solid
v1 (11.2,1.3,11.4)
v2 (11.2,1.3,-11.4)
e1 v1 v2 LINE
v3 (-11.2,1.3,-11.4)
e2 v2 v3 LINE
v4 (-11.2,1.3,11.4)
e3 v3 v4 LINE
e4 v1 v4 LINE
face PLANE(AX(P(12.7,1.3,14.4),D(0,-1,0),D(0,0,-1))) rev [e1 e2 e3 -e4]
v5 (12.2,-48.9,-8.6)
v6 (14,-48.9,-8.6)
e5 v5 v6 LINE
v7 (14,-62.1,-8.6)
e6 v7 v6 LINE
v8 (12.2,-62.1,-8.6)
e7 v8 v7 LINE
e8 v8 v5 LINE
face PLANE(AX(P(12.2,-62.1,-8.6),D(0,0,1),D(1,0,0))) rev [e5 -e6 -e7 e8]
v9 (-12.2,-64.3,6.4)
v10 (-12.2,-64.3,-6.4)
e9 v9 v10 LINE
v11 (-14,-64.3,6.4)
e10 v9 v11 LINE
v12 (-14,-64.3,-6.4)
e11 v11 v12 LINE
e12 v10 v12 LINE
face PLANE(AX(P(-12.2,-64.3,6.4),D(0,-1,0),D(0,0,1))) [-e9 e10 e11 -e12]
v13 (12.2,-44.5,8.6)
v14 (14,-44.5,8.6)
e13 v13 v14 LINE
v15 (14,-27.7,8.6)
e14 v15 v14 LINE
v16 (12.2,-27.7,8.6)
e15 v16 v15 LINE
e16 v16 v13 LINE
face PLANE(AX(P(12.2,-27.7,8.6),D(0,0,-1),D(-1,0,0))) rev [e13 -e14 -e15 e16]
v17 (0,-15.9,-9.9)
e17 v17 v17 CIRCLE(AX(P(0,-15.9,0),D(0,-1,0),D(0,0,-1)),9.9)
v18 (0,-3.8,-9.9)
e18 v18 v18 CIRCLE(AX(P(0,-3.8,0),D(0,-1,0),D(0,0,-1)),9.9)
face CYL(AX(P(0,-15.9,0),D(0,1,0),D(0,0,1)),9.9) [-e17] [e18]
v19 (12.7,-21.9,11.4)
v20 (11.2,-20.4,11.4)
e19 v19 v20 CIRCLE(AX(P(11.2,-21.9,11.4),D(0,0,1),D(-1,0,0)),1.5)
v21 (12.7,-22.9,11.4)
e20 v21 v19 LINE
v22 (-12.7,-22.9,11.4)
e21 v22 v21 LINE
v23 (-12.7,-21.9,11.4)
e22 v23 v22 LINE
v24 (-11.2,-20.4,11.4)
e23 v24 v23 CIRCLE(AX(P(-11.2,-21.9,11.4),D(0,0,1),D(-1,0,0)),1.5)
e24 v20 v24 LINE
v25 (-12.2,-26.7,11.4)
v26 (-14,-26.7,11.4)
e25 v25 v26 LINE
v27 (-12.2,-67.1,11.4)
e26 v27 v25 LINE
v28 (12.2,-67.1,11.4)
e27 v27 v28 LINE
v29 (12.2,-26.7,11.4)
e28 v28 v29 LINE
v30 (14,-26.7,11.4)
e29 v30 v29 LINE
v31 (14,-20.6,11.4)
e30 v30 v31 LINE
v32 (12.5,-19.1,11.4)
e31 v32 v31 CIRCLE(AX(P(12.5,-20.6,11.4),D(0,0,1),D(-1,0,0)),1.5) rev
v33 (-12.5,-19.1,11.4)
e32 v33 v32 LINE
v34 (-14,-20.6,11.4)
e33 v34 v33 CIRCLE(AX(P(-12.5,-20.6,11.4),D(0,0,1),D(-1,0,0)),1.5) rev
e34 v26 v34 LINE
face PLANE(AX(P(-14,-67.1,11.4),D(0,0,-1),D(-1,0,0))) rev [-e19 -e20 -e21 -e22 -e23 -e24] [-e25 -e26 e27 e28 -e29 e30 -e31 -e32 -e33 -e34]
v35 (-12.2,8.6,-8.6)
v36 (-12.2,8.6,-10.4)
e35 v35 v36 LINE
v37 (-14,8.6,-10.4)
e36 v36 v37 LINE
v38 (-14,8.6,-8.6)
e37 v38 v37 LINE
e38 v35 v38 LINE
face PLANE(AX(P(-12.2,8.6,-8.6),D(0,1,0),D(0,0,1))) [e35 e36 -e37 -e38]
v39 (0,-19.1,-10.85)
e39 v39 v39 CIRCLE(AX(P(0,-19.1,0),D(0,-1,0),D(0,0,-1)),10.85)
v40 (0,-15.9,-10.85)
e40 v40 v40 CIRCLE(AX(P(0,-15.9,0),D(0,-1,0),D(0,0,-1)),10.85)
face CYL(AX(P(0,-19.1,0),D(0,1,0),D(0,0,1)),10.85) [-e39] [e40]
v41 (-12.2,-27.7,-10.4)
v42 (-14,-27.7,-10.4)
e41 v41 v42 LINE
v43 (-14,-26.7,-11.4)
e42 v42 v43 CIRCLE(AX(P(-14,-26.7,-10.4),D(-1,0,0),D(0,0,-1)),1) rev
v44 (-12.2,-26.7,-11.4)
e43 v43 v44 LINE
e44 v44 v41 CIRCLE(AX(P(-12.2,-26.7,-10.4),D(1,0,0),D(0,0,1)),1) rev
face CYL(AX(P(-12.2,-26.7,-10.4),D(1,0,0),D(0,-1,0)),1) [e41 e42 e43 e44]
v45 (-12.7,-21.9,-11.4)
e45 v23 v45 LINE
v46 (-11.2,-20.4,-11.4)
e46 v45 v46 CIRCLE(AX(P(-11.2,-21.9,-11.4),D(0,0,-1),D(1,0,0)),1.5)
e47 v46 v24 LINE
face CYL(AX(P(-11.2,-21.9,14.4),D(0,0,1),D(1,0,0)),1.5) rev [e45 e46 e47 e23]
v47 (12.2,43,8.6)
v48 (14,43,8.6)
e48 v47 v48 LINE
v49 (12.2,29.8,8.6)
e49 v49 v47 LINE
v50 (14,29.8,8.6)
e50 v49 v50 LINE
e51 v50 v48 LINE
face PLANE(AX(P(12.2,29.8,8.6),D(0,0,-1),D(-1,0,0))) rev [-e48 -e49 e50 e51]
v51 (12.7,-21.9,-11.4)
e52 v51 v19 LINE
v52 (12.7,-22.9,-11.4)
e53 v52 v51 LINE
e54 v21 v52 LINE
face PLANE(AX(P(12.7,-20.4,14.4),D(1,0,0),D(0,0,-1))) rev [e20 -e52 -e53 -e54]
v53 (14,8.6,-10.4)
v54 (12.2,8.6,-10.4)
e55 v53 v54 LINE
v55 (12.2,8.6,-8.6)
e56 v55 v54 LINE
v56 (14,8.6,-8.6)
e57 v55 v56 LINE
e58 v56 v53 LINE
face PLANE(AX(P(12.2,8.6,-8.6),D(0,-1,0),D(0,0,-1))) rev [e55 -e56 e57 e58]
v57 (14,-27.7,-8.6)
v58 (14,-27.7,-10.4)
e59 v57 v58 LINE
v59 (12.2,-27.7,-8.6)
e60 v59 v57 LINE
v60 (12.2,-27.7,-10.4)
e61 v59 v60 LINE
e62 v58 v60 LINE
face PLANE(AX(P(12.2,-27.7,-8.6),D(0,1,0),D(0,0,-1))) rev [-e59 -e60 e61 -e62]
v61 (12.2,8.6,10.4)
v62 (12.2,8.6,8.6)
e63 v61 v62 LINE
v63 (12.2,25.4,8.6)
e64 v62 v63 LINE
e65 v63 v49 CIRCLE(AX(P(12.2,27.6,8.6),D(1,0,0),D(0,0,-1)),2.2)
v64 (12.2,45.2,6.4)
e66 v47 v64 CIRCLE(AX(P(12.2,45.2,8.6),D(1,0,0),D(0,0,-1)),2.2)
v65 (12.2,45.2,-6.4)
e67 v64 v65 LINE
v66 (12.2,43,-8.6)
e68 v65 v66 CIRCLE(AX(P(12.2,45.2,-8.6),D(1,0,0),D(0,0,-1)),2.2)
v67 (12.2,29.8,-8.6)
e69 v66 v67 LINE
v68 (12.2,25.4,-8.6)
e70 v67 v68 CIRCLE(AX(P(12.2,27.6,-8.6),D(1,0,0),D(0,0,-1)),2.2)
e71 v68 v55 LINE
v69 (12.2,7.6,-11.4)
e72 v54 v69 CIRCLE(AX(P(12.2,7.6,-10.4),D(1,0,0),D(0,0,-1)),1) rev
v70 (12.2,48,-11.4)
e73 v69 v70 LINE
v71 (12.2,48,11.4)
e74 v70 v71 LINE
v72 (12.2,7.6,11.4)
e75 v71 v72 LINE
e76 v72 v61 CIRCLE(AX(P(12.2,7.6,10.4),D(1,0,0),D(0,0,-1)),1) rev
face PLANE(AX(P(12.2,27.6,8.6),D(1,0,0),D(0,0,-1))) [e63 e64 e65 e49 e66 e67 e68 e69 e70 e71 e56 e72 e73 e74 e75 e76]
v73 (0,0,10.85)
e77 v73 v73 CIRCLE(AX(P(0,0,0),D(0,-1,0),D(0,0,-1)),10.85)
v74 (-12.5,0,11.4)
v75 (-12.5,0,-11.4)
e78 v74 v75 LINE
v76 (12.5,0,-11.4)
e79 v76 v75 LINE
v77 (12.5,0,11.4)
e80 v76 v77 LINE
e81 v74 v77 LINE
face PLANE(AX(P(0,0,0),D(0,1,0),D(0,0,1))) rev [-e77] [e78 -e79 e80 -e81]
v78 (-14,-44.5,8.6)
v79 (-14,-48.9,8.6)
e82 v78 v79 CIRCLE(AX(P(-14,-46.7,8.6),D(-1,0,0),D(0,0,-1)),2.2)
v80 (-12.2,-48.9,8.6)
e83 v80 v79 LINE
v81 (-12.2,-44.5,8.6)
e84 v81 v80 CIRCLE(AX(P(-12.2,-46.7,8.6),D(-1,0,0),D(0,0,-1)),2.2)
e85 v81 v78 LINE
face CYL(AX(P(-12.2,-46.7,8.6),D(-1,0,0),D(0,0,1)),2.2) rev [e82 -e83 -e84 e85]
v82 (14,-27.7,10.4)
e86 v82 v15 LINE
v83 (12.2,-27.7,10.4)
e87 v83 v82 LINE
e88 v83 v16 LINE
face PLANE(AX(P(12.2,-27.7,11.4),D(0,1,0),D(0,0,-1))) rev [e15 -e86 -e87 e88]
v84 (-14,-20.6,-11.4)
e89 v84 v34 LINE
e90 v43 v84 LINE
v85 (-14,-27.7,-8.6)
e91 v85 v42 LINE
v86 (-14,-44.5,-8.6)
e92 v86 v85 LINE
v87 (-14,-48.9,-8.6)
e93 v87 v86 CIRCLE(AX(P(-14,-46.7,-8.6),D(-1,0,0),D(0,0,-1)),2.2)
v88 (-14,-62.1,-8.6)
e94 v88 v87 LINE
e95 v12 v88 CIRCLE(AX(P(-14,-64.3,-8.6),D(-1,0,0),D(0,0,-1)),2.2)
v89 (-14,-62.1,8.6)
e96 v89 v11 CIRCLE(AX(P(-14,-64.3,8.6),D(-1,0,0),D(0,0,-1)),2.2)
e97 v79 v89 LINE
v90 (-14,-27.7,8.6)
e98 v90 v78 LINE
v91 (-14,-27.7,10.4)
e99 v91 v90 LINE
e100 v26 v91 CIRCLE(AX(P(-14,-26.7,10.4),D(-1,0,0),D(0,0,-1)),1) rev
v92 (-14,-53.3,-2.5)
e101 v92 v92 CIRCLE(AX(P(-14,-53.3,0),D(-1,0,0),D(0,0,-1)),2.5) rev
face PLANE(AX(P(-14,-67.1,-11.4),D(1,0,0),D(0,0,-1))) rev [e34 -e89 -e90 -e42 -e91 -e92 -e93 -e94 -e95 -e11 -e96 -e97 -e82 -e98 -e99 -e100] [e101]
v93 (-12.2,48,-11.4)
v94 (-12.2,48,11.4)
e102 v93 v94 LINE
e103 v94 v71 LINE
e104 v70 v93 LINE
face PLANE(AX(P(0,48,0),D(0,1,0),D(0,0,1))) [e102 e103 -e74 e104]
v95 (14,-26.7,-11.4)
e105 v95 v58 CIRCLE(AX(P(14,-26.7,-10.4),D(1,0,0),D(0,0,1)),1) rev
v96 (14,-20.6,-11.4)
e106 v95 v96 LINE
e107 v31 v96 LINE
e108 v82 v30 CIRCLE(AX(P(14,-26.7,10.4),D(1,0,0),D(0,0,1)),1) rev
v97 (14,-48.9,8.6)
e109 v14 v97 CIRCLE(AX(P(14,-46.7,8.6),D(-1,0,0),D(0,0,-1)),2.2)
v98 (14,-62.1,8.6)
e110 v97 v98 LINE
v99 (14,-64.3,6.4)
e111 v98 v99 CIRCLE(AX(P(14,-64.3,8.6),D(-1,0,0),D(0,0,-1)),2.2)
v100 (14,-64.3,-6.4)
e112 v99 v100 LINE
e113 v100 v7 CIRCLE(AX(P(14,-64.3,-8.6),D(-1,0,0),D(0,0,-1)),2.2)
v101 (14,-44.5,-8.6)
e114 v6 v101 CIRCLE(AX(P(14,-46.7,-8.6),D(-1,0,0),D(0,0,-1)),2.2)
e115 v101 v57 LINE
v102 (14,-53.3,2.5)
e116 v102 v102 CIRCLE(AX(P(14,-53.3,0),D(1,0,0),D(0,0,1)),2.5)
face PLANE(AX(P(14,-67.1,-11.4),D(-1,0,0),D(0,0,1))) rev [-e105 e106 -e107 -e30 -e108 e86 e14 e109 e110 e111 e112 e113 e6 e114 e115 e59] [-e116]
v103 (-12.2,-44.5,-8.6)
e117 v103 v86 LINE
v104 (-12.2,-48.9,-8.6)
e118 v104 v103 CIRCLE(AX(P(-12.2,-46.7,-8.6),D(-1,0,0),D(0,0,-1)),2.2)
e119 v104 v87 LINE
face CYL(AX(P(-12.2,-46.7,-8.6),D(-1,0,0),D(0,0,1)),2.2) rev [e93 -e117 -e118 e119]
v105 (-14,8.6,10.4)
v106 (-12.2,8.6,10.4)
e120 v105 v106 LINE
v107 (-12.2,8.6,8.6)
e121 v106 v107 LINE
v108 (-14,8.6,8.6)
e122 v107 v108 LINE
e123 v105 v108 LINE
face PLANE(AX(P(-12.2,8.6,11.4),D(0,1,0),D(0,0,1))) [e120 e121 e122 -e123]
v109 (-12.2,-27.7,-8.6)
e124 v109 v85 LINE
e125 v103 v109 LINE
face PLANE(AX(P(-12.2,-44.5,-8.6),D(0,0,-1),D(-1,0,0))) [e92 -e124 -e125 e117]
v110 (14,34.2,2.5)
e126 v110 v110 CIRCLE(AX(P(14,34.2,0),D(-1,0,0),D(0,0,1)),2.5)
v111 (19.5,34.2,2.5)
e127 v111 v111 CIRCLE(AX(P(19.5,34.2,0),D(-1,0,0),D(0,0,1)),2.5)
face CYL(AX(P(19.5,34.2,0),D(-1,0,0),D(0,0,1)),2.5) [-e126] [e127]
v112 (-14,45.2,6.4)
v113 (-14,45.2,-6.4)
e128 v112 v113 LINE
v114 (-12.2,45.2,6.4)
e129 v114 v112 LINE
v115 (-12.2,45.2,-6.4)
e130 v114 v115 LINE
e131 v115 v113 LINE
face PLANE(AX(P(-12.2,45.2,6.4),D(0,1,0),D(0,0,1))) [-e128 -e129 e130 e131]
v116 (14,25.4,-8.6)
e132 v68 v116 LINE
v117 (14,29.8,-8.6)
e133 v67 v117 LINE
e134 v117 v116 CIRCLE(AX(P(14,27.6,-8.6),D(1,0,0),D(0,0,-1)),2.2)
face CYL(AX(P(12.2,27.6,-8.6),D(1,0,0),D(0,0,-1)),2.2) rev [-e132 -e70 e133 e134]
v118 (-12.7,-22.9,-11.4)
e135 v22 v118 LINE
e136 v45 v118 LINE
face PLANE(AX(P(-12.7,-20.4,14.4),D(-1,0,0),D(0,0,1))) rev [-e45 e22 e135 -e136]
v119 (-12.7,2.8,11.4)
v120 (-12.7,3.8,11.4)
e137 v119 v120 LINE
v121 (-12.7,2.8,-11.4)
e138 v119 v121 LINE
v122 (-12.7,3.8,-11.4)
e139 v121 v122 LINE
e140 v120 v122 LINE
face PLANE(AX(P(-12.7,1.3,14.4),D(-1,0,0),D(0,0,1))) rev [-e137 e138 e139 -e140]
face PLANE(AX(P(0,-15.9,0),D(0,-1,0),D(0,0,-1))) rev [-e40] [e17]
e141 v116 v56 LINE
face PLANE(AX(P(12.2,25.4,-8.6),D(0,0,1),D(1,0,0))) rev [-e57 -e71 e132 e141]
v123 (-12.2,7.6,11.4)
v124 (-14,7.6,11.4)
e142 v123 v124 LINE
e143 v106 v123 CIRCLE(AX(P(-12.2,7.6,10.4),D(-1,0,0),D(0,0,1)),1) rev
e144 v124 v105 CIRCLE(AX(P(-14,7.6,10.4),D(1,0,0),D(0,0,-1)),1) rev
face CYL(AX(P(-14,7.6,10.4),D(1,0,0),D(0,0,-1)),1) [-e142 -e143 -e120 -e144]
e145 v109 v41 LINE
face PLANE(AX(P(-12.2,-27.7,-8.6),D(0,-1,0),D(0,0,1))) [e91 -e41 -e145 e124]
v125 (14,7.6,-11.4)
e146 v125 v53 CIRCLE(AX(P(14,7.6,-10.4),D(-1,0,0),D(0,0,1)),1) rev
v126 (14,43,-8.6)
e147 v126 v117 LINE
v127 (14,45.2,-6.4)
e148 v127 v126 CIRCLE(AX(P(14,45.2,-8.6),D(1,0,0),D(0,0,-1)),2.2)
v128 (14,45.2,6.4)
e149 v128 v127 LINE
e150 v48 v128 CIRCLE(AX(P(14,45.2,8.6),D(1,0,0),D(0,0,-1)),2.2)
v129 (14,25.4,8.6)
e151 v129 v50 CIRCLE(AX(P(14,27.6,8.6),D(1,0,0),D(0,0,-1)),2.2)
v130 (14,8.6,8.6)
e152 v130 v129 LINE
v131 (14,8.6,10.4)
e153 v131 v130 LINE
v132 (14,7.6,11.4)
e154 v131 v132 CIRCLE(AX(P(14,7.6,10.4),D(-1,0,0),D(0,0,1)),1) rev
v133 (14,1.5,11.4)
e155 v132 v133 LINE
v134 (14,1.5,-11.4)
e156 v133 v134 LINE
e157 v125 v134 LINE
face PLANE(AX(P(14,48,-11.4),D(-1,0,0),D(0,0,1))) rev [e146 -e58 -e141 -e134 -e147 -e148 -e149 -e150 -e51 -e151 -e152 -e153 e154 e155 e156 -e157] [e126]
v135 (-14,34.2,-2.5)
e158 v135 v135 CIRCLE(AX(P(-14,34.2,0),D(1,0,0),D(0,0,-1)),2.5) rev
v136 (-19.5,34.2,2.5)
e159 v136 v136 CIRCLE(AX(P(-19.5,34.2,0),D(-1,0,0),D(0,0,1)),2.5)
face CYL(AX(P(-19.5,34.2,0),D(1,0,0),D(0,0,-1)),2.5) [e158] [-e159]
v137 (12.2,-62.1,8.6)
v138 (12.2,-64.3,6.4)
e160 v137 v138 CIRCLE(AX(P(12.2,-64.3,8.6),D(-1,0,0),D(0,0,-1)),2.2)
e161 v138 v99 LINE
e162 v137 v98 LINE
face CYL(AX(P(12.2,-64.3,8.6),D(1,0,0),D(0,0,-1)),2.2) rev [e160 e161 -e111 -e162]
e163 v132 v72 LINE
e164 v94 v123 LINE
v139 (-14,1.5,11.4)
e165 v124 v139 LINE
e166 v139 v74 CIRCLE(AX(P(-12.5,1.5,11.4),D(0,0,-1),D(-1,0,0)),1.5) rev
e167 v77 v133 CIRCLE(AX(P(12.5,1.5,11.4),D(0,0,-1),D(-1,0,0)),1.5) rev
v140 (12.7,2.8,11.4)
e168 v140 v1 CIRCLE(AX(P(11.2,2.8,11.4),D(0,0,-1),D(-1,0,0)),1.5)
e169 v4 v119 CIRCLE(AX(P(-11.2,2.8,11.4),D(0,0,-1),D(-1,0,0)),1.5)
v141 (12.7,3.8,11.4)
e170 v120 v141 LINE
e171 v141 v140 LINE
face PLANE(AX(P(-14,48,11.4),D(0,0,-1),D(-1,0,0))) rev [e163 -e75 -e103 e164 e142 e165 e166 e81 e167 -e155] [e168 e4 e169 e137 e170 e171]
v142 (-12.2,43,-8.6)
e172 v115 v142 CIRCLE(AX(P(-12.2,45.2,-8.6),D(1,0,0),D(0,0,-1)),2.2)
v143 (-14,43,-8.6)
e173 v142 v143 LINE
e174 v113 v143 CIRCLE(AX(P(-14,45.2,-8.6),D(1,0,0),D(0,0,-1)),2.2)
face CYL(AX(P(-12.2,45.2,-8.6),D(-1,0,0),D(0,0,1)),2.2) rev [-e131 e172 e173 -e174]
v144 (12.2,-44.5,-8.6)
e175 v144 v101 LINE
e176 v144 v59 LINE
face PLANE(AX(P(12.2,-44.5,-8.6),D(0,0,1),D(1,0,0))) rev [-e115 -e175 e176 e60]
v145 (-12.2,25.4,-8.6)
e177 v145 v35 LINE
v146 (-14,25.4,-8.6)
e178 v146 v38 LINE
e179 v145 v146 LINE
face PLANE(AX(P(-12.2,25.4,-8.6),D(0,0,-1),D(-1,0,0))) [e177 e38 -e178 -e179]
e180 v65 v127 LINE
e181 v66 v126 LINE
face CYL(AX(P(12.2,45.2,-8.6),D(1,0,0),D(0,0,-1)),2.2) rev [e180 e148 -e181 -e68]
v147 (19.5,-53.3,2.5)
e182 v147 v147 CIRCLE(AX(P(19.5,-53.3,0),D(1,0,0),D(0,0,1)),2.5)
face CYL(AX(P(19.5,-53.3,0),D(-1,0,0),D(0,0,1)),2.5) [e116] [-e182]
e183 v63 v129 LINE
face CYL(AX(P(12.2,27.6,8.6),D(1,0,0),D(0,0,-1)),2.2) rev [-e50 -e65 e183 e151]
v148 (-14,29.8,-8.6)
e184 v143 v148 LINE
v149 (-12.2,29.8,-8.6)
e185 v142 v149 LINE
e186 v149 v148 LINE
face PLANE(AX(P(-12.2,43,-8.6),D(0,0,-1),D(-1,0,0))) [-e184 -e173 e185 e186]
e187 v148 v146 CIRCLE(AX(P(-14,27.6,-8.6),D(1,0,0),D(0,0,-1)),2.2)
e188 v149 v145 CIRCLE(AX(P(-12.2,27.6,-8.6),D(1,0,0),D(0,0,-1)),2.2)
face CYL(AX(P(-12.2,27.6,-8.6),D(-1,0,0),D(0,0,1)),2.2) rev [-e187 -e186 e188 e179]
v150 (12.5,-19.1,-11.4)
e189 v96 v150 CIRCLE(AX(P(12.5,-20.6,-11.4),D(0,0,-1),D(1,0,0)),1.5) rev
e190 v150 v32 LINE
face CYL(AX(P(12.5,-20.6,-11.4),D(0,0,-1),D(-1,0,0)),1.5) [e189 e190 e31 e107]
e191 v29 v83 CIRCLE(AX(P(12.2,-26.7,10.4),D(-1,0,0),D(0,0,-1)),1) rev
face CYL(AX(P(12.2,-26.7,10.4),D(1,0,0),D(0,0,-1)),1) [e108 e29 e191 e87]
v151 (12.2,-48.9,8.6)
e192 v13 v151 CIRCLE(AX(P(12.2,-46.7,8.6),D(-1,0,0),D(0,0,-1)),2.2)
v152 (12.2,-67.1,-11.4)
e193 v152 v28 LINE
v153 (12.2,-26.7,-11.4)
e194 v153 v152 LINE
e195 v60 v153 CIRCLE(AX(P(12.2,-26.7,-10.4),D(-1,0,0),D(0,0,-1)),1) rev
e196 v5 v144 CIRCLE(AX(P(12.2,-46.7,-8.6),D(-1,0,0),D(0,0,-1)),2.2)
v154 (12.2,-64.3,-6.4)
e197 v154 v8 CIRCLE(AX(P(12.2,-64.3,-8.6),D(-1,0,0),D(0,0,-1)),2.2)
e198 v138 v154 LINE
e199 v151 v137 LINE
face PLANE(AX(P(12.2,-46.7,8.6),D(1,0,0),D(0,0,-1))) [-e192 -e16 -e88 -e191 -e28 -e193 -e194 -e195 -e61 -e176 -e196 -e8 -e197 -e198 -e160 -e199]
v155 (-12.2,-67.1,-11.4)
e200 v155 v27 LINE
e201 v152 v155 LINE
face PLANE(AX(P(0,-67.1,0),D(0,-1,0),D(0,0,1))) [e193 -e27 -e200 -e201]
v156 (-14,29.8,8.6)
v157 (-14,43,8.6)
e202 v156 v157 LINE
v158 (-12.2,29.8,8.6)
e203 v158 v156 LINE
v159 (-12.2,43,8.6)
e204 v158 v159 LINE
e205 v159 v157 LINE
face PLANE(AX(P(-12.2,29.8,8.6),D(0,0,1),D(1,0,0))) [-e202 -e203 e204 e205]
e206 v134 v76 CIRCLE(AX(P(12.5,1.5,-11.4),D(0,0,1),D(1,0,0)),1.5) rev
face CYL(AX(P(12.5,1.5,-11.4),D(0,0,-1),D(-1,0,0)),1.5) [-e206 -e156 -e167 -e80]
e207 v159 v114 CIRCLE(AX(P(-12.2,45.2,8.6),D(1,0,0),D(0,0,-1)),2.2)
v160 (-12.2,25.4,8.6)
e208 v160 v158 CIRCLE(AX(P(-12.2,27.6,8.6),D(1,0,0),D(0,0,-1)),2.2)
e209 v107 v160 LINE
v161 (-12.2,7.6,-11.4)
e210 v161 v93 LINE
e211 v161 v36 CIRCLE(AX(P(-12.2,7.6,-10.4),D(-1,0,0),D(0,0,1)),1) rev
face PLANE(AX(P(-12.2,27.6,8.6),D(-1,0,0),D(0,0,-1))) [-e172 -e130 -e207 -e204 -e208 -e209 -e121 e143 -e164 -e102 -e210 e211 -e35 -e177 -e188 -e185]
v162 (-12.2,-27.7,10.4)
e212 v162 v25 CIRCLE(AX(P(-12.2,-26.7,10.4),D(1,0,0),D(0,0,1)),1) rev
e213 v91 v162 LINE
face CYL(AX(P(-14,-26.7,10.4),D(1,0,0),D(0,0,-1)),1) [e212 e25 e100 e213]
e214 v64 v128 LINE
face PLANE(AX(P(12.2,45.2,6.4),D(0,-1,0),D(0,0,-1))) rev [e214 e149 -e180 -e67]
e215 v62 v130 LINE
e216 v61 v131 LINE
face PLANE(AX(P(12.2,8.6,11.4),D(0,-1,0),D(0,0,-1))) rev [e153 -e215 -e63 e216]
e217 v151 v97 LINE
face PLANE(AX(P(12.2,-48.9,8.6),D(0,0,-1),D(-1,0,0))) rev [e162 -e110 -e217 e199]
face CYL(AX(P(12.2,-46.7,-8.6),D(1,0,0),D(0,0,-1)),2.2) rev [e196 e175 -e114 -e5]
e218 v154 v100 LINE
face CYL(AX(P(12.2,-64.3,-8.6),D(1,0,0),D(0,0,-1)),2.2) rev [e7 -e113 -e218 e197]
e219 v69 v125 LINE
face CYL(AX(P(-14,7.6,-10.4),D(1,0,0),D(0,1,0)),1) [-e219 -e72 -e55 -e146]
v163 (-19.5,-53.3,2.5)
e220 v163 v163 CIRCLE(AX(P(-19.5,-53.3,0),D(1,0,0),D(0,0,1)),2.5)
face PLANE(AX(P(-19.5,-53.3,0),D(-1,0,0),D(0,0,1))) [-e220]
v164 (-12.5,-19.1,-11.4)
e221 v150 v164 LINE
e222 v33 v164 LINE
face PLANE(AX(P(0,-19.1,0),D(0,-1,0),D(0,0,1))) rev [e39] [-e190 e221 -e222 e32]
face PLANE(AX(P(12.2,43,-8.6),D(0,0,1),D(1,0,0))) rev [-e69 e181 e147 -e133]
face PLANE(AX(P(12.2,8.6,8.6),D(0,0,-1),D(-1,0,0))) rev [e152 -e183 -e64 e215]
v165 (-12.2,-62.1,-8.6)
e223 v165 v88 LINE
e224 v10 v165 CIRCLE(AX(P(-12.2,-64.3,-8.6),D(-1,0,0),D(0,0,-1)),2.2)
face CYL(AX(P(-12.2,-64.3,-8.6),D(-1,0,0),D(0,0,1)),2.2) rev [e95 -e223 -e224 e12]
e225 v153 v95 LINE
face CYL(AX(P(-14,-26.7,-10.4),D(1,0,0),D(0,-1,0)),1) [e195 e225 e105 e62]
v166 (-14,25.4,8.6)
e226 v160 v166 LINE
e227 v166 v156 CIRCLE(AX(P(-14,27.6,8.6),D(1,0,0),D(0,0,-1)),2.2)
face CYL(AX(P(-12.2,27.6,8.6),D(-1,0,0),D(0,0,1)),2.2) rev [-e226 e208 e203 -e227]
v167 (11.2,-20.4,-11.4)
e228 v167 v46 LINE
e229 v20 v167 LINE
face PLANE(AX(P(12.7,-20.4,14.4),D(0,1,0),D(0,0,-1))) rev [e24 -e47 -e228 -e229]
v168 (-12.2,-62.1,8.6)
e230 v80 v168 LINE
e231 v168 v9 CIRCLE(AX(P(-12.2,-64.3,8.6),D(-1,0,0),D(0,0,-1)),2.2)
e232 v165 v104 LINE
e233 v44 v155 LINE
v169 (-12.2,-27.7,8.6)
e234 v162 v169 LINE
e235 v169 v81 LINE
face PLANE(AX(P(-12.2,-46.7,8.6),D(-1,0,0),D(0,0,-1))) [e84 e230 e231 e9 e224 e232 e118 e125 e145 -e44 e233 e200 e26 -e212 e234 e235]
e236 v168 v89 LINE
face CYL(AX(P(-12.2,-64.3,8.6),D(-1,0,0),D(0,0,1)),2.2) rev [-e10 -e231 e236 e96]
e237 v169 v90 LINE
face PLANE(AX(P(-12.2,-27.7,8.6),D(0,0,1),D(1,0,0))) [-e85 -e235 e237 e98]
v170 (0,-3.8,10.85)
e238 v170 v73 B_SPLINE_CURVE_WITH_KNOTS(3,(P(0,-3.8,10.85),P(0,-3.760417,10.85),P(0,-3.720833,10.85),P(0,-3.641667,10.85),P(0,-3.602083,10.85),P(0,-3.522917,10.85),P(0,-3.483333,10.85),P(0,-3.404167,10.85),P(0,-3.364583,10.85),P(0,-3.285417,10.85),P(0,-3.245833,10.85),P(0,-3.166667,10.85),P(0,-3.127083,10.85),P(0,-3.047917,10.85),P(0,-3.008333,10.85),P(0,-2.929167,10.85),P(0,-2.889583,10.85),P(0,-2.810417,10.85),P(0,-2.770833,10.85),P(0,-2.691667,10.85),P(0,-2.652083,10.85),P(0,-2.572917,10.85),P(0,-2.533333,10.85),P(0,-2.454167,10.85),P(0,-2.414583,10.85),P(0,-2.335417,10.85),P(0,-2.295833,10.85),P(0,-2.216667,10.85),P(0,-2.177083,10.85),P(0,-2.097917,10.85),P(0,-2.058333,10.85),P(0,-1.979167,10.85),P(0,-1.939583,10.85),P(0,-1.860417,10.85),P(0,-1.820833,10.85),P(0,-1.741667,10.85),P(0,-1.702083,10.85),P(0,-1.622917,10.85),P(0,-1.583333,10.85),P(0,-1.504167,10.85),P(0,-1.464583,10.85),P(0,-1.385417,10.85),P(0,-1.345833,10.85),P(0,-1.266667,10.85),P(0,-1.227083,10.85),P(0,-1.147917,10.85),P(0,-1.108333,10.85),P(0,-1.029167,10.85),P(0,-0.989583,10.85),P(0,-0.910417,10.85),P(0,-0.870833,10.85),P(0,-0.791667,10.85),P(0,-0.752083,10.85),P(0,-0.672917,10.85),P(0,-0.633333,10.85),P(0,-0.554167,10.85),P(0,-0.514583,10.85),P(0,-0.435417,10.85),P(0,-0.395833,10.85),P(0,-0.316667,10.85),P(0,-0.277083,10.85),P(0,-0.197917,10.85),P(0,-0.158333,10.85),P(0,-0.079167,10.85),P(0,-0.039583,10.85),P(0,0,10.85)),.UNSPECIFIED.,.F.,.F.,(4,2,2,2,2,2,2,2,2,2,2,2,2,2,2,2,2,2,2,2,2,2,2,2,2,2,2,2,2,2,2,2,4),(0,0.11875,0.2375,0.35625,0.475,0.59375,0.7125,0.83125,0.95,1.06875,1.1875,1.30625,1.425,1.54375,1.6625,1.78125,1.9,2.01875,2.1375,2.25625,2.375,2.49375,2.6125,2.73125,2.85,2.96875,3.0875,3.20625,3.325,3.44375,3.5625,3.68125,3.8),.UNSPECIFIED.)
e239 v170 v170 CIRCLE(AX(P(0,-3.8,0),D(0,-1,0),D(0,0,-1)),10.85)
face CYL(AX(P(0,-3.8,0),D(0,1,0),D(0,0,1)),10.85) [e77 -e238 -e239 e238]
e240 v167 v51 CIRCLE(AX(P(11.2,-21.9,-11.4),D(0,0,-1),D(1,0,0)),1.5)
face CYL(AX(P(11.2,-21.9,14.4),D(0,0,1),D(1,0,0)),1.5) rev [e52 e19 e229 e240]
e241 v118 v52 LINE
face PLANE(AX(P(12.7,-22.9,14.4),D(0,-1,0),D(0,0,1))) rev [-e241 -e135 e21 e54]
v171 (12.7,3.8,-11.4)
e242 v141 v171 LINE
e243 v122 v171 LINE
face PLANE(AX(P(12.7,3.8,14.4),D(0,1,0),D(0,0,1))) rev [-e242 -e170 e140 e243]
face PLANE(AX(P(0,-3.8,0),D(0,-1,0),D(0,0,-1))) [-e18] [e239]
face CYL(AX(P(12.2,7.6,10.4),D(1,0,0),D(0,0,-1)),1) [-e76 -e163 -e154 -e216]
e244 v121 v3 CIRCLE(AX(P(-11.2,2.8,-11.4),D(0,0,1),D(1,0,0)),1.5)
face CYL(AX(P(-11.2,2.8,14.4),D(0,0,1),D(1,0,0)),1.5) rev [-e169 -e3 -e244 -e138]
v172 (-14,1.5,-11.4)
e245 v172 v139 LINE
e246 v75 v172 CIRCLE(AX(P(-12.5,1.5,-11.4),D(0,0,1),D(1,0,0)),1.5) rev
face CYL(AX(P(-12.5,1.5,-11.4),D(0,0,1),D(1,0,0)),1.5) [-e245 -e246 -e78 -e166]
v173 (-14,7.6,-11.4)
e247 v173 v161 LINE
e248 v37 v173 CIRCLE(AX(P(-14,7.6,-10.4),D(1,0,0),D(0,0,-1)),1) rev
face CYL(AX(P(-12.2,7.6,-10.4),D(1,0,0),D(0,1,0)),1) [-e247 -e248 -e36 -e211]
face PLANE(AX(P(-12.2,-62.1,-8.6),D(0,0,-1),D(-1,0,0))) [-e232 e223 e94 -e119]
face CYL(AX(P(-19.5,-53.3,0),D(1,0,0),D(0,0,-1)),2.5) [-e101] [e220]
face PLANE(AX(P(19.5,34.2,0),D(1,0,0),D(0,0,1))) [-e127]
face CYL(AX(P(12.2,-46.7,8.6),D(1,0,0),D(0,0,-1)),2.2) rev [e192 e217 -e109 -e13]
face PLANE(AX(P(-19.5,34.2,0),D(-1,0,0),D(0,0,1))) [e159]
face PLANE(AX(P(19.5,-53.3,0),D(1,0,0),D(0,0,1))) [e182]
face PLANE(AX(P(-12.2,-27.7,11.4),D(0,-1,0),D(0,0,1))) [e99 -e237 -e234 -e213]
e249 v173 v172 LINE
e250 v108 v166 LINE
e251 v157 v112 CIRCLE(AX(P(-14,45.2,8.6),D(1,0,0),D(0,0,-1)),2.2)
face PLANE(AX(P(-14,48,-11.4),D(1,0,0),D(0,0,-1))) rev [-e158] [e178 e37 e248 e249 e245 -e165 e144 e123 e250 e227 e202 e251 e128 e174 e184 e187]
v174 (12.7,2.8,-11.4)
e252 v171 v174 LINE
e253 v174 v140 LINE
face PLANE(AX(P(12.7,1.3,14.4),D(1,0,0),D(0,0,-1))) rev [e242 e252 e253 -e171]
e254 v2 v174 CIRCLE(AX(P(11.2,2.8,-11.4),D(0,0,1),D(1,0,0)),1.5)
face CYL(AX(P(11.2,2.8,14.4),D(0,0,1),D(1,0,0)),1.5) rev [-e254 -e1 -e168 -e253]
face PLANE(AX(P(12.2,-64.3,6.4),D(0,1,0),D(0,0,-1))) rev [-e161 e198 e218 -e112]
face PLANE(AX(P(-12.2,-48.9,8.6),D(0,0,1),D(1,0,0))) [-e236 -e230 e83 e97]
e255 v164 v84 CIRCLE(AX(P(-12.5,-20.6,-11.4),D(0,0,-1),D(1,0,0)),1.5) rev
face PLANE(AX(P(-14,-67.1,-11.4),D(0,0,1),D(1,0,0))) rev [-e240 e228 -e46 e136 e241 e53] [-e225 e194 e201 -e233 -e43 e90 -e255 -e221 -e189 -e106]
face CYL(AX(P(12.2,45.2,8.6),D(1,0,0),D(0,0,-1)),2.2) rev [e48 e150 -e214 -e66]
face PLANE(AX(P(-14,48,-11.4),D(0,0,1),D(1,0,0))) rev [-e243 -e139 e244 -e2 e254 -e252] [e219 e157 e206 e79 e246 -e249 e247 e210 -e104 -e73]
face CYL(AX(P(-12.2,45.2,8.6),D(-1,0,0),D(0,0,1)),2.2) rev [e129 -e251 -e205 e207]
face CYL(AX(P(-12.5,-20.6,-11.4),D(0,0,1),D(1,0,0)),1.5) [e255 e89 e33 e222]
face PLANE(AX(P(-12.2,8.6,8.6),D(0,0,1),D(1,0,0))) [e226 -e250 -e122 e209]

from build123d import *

# Parameters (mm, degrees)
SKETCH1_W            = 28
SKETCH1_H            = 22.8
BOSS_EXTRUDE1_DEPTH  = 48
SKETCH4_R            = 10.85
BOSS_EXTRUDE4_DEPTH  = 3.8
SKETCH5_R            = 9.9
BOSS_EXTRUDE5_DEPTH  = 12.1
SKETCH6_R            = 10.85
BOSS_EXTRUDE6_DEPTH  = 3.2
CUT_EXTRUDE3_DEPTH   = 1.8
FILLET2_R            = 1
FILLET2_OF_MIRROR2_R = 1
SKETCH9_W            = 25.4
SKETCH9_H            = 2.5
CUT_EXTRUDE4_DEPTH   = 25.8
FILLET3_R            = 1.5
SKETCH10_R           = 2.5
BOSS_EXTRUDE7_DEPTH  = 5.5
MIRROR6_START        = -12.2
MIRROR6_OUTLINE_W    = 1.3
MIRROR6_OUTLINE_H    = 22.8
MIRROR6_OUTLINE_W_2  = 44.2
MIRROR6_DEPTH        = 24.4
MIRROR6_START_2      = -14
MIRROR6_2_DEPTH      = 28
MIRROR6_START_3      = -19.5
MIRROR6_3_OUTLINE_R  = 2.5
MIRROR6_3_DEPTH      = 39
MIRROR6_START_4      = -12.5
MIRROR6_4_OUTLINE_W  = 1.3
MIRROR6_4_OUTLINE_H  = 22.8
MIRROR6_4_DEPTH      = 25
MIRROR6_START_5      = -11.4
MIRROR6_5_DEPTH      = 22.8


with BuildPart() as part:
    # Sketch1 → Boss-Extrude1 (new body)
    with BuildSketch(Plane(origin=(0, 0, 0), x_dir=(1, 0, 0), z_dir=(0, 1, 0))):
        Rectangle(SKETCH1_W, SKETCH1_H)
    extrude(amount=BOSS_EXTRUDE1_DEPTH)

    # Sketch4 → Boss-Extrude4 (add)
    with BuildSketch(Plane.XZ):
        with Locations(Location((0, 0, 0), (0, 0, 90))):
            Circle(SKETCH4_R)
    extrude(amount=BOSS_EXTRUDE4_DEPTH)

    # Sketch5 → Boss-Extrude5 (add)
    with BuildSketch(Plane.XZ.offset(3.8)):
        with Locations(Location((0, 0, 0), (0, 0, 270))):
            Circle(SKETCH5_R)
    extrude(amount=BOSS_EXTRUDE5_DEPTH)

    # Sketch6 → Boss-Extrude6 (add)
    with BuildSketch(Plane.XZ.offset(15.9)):
        with Locations(Location((0, 0, 0), (0, 0, 90))):
            Circle(SKETCH6_R)
    extrude(amount=BOSS_EXTRUDE6_DEPTH)

    # Sketch8 → Cut-Extrude3 (cut)
    with BuildSketch(Plane(origin=(14, 0, 0), x_dir=(0, 0, -1), z_dir=(1, 0, 0))):
        with BuildLine():
            Line((8.6, 8.6), (11.4, 8.6))
            Line((11.4, 8.6), (11.4, 48))
            Line((11.4, 48), (-11.4, 48))
            Line((-11.4, 48), (-11.4, 8.6))
            Line((-11.4, 8.6), (-8.6, 8.6))
            Line((-8.6, 8.6), (-8.6, 25.4))
            ThreePointArc((-8.6, 25.4), (-6.4, 27.6), (-8.6, 29.8))
            Line((-8.6, 29.8), (-8.6, 43))
            ThreePointArc((-8.6, 43), (-7.044365081, 43.644365081), (-6.4, 45.2))
            Line((-6.4, 45.2), (6.4, 45.2))
            ThreePointArc((6.4, 45.2), (7.044365081, 43.644365081), (8.6, 43))
            Line((8.6, 43), (8.6, 29.8))
            ThreePointArc((8.6, 29.8), (6.4, 27.6), (8.6, 25.4))
            Line((8.6, 25.4), (8.6, 8.6))
        make_face()
    cut_extrude3 = extrude(amount=-CUT_EXTRUDE3_DEPTH, mode=Mode.SUBTRACT)

    # Fillet2
    fillet2_edges = [part.edges().sort_by_distance(p)[0] for p in [
        (13.1, 8.6, 11.4),
        (13.1, 8.6, -11.4),
    ]]
    fillet(fillet2_edges, radius=FILLET2_R)

    # Mirror2: Cut-Extrude3 across plane
    add(cut_extrude3.mirror(Plane(origin=(0, 0, 0), x_dir=(0, 0, 1), z_dir=(1, 0, 0))), mode=Mode.SUBTRACT)

    # Fillet2 of Mirror2
    fillet2_of_mirror2_edges = [part.edges().sort_by_distance(p)[0] for p in [
        (-13.1, 8.6, 11.4),
        (-13.1, 8.6, -11.4),
    ]]
    fillet(fillet2_of_mirror2_edges, radius=FILLET2_OF_MIRROR2_R)

    # Sketch9 → Cut-Extrude4 (cut)
    with BuildSketch(Plane(origin=(0, 0, -11.4), x_dir=(-1, 0, 0), z_dir=(0, 0, -1))):
        with Locations((0, 2.55)):
            Rectangle(SKETCH9_W, SKETCH9_H)
    extrude(amount=-CUT_EXTRUDE4_DEPTH, mode=Mode.SUBTRACT)

    # Fillet3
    fillet3_edges = [part.edges().sort_by_distance(p)[0] for p in [
        (12.7, 1.3, 0),
        (-12.7, 1.3, 0),
        (-14, 0, 0),
        (14, 0, 0),
    ]]
    fillet(fillet3_edges, radius=FILLET3_R)

    # Sketch10 → Boss-Extrude7 (add)
    with BuildSketch(Plane.ZY.offset(14)):
        with Locations(Location((0, 34.2, 0), (0, 0, 180))):
            Circle(SKETCH10_R)
    boss_extrude7 = extrude(amount=BOSS_EXTRUDE7_DEPTH)

    # Mirror3: Boss-Extrude7 across plane
    add(boss_extrude7.mirror(Plane(origin=(0, 0, 0), x_dir=(0, 0, 1), z_dir=(1, 0, 0))))

    # Mirror6: read off the stored shape, not the designer's step
    # Mirror6 outline → Mirror6 (add)
    with BuildSketch(Plane.YZ.offset(MIRROR6_START)):
        with Locations((-19.75, 0)):
            Rectangle(MIRROR6_OUTLINE_W, MIRROR6_OUTLINE_H)
        with Locations((-45, 0)):
            Rectangle(MIRROR6_OUTLINE_W_2, MIRROR6_OUTLINE_H)
    extrude(amount=MIRROR6_DEPTH)

    # Mirror6 2 outline → Mirror6 2 (add)
    with BuildSketch(Plane.YZ.offset(MIRROR6_START_2)):
        with BuildLine():
            Line((-26.7, -11.4), (-22.9, -11.4))
            Line((-22.9, -11.4), (-22.9, 11.4))
            Line((-22.9, 11.4), (-26.7, 11.4))
            ThreePointArc((-26.7, 11.4), (-27.407106781, 11.107106781), (-27.7, 10.4))
            Line((-27.7, 10.4), (-27.7, 8.6))
            Line((-27.7, 8.6), (-44.5, 8.6))
            ThreePointArc((-44.5, 8.6), (-46.7, 6.4), (-48.9, 8.6))
            Line((-48.9, 8.6), (-62.1, 8.6))
            ThreePointArc((-62.1, 8.6), (-62.744365081, 7.044365081), (-64.3, 6.4))
            Line((-64.3, 6.4), (-64.3, -6.4))
            ThreePointArc((-64.3, -6.4), (-62.744365081, -7.044365081), (-62.1, -8.6))
            Line((-62.1, -8.6), (-48.9, -8.6))
            ThreePointArc((-48.9, -8.6), (-46.7, -6.4), (-44.5, -8.6))
            Line((-44.5, -8.6), (-27.7, -8.6))
            Line((-27.7, -8.6), (-27.7, -10.4))
            ThreePointArc((-27.7, -10.4), (-27.407106781, -11.107106781), (-26.7, -11.4))
        make_face()
    extrude(amount=MIRROR6_2_DEPTH)

    # Mirror6 3 outline → Mirror6 3 (add)
    with BuildSketch(Plane.YZ.offset(MIRROR6_START_3)):
        with Locations((-53.3, 0)):
            Circle(MIRROR6_3_OUTLINE_R)
    extrude(amount=MIRROR6_3_DEPTH)

    # Mirror6 4 outline → Mirror6 4 (add)
    with BuildSketch(Plane.YZ.offset(MIRROR6_START_4)):
        with Locations((-19.75, 0)):
            Rectangle(MIRROR6_4_OUTLINE_W, MIRROR6_4_OUTLINE_H)
    extrude(amount=MIRROR6_4_DEPTH)

    # Mirror6 5 outline → Mirror6 5 (add)
    with BuildSketch(Plane.XY.offset(MIRROR6_START_5)):
        with BuildLine():
            Line((12.7, -21.9), (12.7, -22.9))
            Line((12.7, -22.9), (14, -22.9))
            Line((14, -22.9), (14, -20.6))
            ThreePointArc((14, -20.6), (13.560660172, -19.539339828), (12.5, -19.1))
            Line((12.5, -19.1), (12.5, -20.4))
            Line((12.5, -20.4), (11.2, -20.4))
            ThreePointArc((11.2, -20.4), (12.260660172, -20.839339828), (12.7, -21.9))
        make_face()
        with BuildLine():
            Line((-14, -22.9), (-12.7, -22.9))
            Line((-12.7, -22.9), (-12.7, -21.9))
            ThreePointArc((-12.7, -21.9), (-12.260660172, -20.839339828), (-11.2, -20.4))
            Line((-11.2, -20.4), (-12.5, -20.4))
            Line((-12.5, -20.4), (-12.5, -19.1))
            ThreePointArc((-12.5, -19.1), (-13.560660172, -19.539339828), (-14, -20.6))
            Line((-14, -20.6), (-14, -22.9))
        make_face()
    extrude(amount=MIRROR6_5_DEPTH)


solid = part.part
